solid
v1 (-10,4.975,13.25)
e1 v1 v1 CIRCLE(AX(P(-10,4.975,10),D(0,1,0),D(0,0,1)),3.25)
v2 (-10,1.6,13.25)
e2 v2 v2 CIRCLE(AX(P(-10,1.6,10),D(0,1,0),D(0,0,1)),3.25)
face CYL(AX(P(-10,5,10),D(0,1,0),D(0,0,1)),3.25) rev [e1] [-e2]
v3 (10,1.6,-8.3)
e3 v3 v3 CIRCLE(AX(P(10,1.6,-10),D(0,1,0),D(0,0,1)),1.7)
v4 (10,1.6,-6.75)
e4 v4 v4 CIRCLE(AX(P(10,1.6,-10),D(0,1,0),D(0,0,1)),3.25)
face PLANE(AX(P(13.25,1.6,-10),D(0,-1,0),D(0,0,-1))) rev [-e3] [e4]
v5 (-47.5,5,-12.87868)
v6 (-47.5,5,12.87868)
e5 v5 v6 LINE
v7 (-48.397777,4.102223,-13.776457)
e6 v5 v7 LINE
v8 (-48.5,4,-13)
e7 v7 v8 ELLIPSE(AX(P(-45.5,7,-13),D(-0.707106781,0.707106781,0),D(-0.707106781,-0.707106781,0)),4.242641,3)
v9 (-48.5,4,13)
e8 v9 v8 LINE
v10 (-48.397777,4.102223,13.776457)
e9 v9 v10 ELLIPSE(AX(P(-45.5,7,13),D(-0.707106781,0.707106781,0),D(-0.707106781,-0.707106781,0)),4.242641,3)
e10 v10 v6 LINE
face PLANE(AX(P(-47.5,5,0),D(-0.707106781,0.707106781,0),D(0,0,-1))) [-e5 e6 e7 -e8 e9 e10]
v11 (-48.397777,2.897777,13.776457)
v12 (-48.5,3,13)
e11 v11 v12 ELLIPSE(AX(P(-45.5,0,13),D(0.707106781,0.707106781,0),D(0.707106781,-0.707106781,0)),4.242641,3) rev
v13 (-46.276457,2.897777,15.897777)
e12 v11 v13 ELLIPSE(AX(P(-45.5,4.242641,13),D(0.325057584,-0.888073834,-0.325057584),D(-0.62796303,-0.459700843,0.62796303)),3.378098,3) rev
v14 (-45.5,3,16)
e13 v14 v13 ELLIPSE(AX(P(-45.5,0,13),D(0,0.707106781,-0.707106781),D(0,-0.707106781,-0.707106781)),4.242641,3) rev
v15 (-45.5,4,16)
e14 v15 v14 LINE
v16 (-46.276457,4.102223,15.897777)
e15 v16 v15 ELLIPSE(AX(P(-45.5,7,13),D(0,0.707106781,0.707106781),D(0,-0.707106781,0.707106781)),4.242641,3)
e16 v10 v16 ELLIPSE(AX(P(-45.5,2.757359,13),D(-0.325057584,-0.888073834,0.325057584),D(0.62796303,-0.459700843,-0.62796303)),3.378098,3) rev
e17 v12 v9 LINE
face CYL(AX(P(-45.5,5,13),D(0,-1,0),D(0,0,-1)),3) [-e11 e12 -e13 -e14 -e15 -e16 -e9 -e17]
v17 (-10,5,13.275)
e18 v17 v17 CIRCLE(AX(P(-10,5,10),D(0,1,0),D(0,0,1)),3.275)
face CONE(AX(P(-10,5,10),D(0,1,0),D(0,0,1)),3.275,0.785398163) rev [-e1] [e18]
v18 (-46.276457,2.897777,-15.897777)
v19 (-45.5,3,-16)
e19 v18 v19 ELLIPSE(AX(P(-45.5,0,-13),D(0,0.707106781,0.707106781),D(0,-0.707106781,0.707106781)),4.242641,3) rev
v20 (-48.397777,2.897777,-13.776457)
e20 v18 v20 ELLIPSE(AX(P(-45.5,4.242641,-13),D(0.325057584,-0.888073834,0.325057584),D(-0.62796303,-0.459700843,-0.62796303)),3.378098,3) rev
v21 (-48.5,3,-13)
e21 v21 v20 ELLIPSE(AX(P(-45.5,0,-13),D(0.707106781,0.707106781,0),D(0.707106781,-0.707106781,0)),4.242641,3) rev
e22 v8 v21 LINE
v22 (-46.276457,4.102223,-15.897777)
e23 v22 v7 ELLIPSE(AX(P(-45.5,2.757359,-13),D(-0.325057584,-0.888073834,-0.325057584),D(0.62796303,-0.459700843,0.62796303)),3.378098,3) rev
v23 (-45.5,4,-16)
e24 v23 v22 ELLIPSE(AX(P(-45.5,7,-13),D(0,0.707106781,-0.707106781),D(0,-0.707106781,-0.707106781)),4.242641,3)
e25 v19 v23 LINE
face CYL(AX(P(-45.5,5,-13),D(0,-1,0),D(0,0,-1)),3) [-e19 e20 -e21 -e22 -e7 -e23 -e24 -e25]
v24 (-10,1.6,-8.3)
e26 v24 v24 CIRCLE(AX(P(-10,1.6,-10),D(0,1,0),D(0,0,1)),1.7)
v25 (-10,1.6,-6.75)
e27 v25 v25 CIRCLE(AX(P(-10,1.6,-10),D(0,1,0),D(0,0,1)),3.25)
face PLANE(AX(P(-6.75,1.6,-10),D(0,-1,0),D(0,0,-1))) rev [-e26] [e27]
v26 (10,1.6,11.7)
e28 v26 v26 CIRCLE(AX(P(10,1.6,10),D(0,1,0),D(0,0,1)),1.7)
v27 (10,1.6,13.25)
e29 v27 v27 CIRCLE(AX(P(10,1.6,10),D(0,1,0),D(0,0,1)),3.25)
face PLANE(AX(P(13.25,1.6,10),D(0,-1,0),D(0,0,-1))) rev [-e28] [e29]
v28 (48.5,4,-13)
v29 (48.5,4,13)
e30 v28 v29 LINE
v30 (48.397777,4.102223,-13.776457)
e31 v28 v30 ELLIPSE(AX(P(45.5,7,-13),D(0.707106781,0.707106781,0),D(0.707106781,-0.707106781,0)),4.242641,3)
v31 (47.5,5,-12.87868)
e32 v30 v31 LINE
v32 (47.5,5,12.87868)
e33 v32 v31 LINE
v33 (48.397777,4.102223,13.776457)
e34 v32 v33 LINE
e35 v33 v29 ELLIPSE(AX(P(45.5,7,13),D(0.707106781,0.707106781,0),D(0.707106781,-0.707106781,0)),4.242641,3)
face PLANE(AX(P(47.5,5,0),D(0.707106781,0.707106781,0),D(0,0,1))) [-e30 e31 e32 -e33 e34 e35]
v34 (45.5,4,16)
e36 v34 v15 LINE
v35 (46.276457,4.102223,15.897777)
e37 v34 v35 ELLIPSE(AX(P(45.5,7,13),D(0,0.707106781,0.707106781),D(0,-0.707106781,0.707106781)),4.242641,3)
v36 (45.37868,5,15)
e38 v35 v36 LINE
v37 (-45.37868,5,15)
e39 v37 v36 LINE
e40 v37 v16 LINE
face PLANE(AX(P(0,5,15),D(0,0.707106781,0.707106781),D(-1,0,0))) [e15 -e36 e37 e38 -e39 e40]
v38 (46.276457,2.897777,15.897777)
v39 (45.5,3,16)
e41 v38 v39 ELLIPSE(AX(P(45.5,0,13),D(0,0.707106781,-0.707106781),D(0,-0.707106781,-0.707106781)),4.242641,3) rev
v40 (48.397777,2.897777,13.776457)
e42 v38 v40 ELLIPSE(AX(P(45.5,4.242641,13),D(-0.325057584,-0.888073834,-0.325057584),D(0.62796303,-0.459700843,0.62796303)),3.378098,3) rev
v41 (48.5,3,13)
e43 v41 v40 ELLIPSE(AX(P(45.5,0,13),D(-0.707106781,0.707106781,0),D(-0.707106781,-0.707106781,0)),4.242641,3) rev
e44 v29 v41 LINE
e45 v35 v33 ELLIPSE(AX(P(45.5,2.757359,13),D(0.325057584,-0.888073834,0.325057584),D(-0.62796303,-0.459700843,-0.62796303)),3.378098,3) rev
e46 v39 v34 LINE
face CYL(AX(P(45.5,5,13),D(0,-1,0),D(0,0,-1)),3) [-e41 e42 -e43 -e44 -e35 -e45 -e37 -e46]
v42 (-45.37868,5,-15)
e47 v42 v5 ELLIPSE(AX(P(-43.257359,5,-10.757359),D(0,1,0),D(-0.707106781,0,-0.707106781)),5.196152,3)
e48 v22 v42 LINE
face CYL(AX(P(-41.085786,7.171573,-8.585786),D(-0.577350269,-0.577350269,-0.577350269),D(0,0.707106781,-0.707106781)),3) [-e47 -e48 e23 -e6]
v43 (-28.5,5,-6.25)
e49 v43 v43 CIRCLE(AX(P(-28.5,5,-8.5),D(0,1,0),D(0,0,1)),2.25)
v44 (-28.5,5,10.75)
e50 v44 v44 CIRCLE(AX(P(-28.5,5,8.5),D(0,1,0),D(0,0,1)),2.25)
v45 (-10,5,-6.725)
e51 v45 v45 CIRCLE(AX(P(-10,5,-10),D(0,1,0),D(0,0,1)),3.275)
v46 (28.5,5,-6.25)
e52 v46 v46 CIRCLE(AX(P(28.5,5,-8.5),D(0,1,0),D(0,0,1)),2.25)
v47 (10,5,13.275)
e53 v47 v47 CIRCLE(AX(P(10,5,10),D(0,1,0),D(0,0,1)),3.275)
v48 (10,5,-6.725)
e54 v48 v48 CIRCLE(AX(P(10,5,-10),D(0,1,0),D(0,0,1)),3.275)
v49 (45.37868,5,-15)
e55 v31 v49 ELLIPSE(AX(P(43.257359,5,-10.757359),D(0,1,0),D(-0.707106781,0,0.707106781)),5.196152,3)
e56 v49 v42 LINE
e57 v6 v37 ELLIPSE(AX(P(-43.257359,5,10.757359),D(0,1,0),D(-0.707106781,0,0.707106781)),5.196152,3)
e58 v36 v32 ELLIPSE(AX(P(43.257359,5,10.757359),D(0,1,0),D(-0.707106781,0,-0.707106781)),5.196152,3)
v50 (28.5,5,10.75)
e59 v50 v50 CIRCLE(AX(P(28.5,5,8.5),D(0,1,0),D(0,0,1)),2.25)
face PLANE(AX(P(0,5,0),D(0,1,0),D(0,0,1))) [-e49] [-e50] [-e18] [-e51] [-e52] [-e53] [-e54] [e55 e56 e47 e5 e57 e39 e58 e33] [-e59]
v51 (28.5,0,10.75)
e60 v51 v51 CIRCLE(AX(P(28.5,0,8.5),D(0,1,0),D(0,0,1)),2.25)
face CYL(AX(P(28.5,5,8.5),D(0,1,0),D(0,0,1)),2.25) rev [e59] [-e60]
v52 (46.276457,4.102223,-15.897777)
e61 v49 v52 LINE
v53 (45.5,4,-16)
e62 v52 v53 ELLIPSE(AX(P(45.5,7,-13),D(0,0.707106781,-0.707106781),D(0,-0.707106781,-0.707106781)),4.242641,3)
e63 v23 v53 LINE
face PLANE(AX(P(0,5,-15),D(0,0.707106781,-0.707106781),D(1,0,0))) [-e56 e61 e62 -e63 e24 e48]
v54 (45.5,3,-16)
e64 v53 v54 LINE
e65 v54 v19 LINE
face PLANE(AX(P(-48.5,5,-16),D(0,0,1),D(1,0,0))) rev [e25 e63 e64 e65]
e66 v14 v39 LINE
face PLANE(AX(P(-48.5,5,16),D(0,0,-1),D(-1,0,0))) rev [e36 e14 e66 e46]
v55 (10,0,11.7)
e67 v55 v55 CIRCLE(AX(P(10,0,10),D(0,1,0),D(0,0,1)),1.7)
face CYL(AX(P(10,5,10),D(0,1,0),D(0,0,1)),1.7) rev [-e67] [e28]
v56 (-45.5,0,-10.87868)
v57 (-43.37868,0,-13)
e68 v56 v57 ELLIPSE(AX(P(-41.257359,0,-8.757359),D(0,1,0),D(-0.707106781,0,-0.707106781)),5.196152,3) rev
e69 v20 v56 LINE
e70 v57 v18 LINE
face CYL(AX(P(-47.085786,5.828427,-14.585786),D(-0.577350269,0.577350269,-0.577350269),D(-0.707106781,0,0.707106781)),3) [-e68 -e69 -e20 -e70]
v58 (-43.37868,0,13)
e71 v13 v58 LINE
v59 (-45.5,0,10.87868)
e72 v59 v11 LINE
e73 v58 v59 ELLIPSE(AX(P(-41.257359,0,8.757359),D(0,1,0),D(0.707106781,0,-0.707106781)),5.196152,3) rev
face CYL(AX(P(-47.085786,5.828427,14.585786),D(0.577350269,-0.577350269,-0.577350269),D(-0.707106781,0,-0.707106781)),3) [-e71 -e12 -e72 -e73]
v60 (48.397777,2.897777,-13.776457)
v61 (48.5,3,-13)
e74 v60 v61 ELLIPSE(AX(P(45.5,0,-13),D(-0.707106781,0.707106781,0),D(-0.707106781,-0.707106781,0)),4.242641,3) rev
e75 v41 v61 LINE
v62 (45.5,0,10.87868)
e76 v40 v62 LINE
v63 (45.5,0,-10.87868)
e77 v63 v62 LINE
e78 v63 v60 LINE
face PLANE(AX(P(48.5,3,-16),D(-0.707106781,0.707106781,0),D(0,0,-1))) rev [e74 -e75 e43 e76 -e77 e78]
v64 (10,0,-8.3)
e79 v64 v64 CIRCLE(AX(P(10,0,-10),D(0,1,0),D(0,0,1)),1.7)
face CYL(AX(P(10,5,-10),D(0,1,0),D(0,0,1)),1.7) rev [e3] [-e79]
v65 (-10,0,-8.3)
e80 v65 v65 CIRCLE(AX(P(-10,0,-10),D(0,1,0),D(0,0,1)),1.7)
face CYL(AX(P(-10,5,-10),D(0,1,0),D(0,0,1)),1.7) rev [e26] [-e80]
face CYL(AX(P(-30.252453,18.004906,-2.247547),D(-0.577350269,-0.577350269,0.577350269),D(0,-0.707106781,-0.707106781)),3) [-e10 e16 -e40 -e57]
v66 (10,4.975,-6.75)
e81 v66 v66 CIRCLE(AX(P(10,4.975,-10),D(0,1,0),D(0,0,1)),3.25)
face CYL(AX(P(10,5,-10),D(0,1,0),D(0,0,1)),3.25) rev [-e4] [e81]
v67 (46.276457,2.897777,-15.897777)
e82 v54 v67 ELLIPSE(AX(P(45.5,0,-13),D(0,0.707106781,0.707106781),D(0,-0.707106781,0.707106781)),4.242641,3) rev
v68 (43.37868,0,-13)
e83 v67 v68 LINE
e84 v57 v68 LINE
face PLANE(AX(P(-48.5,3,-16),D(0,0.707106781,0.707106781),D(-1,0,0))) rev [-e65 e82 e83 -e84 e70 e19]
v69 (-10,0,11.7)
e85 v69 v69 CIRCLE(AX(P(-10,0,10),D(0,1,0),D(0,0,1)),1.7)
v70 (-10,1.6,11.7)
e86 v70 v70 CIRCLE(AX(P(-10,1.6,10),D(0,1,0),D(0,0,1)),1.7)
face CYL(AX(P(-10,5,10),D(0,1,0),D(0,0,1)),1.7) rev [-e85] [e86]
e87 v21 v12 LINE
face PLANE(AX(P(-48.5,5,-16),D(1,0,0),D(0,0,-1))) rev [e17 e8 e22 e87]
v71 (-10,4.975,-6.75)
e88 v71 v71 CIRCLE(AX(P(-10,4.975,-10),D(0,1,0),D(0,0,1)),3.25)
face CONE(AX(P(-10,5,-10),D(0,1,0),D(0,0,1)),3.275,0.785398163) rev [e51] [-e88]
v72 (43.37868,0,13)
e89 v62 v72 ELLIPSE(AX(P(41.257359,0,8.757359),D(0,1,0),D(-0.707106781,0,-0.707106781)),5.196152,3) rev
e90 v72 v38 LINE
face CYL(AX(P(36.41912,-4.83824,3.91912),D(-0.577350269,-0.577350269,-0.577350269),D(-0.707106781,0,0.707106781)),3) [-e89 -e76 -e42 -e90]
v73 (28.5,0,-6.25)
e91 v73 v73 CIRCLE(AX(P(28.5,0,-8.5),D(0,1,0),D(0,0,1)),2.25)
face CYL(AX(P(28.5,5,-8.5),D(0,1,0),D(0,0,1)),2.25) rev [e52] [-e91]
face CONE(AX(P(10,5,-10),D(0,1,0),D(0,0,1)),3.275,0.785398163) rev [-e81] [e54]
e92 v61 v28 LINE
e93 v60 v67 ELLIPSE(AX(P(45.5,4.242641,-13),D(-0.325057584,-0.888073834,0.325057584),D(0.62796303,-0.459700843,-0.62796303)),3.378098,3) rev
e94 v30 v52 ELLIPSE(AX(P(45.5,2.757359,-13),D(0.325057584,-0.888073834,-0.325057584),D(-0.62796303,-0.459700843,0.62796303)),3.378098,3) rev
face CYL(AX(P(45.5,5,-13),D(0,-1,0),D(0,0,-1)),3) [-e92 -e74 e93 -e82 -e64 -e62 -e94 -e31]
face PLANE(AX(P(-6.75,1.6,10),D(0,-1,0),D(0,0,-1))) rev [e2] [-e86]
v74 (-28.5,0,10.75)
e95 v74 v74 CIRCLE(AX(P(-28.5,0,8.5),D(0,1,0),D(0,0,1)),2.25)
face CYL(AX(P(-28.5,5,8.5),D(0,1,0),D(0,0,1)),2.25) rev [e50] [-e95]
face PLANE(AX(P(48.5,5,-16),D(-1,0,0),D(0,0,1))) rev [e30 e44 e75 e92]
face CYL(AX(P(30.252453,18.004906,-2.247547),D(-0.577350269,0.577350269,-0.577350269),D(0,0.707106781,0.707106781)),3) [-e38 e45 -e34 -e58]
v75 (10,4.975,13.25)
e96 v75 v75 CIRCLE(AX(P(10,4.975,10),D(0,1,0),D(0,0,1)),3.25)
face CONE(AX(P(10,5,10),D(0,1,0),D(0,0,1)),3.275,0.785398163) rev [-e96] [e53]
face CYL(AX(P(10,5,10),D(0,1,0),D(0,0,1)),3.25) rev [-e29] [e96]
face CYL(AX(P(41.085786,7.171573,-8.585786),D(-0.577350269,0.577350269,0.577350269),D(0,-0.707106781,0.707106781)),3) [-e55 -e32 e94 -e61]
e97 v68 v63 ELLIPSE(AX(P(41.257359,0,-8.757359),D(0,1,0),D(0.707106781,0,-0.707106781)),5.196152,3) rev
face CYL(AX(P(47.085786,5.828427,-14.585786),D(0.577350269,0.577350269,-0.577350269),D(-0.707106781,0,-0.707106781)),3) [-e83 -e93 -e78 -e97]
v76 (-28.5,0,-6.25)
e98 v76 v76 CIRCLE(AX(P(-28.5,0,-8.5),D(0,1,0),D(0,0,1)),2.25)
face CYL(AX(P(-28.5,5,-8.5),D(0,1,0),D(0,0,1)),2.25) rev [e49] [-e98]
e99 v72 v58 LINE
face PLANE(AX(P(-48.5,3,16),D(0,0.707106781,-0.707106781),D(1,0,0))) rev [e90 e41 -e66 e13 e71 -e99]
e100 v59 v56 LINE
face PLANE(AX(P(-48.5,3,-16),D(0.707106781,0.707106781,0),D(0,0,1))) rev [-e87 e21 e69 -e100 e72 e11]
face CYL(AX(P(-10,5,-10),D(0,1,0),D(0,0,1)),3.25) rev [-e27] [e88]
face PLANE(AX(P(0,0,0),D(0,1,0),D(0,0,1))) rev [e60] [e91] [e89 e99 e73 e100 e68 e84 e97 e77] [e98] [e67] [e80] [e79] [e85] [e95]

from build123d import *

# Parameters (mm, degrees)
SKETCH1_W                                    = 97
SKETCH1_H                                    = 32
BOSS_EXTRUDE1_DEPTH                          = 5
HOLE1_D                                      = 4.5
HOLE1_DEPTH                                  = 6
CHAMFER1_SIZE                                = 1
CHAMFER2_SIZE                                = 3
FILLET1_R                                    = 3
CBORE_FOR_M3_HEX_SOCKET_HEAD_CAP_SCR_2_COUNT = 2
CBORE_FOR_M3_HEX_SOCKET_HEAD_CAP_SCR_2_PITCH = 20
CBORE_FOR_M3_HEX_SOCKET_HEAD_CAP_SCR_3_COUNT = 2
CBORE_FOR_M3_HEX_SOCKET_HEAD_CAP_SCR_3_PITCH = 20
CBORE_FOR_M3_HEX_SOCKET_HEAD_CAP_SCR_4_COUNT = 2
CBORE_FOR_M3_HEX_SOCKET_HEAD_CAP_SCR_4_PITCH = 28.284271247


with BuildPart() as part:
    # Sketch1 → Boss-Extrude1 (new body)
    with BuildSketch(Plane(origin=(0, 0, 0), x_dir=(1, 0, 0), z_dir=(0, 1, 0))):
        Rectangle(SKETCH1_W, SKETCH1_H)
    extrude(amount=BOSS_EXTRUDE1_DEPTH)

    # Hole1
    with Locations(Plane(origin=(0, 5, 0), x_dir=(1, 0, 0), z_dir=(0, 1, 0))):
        with Locations((-28.5, 8.5), (-28.5, -8.5), (28.5, -8.5), (28.5, 8.5)):
            Hole(HOLE1_D / 2, depth=HOLE1_DEPTH)

    # Chamfer1
    chamfer1_edges = [part.edges().sort_by_distance(p)[0] for p in [
        (-48.5, 5, 0),
        (0, 5, 16),
        (48.5, 5, 0),
        (0, 5, -16),
    ]]
    chamfer(chamfer1_edges, length=CHAMFER1_SIZE)

    # Chamfer2
    chamfer2_edges = [part.edges().sort_by_distance(p)[0] for p in [
        (0, 0, 16),
        (-48.5, 0, 0),
        (0, 0, -16),
        (48.5, 0, 0),
    ]]
    chamfer(chamfer2_edges, length=CHAMFER2_SIZE)

    # Fillet1
    # the kernel refuses this fillet: 3 mm, written as the material it takes off along each edge
    with BuildSketch(Plane(origin=(48.5, -4.5, 16), x_dir=(0, 0, -1), z_dir=(0, 1, 0)), Plane(origin=(48.5, -4.5, -16), x_dir=(-1, 0, 0), z_dir=(0, 1, 0))) as fillet1_piece_1:
        with BuildLine():
            CenterArc((FILLET1_R, FILLET1_R), FILLET1_R, 180, 90)
            Line((0, FILLET1_R), (0, 0))
            Line((0, 0), (FILLET1_R, 0))
        make_face()
    extrude(amount=16, mode=Mode.SUBTRACT)
    with BuildSketch(Plane(origin=(-48.5, -4.5, 16), x_dir=(0, 0, -1), z_dir=(0, 1, 0)), Plane(origin=(-48.5, -4.5, -16), x_dir=(1, 0, 0), z_dir=(0, 1, 0))) as fillet1_piece_2:
        with BuildLine():
            CenterArc((FILLET1_R, -FILLET1_R), FILLET1_R, 90, 90)
            Line((0, -FILLET1_R), (0, 0))
            Line((0, 0), (FILLET1_R, 0))
        make_face()
    extrude(amount=16, mode=Mode.SUBTRACT)
    with BuildSketch(Plane(origin=(-51, 1.5, -18.5), x_dir=(0.8164965809277261, -0.40824829046386363, -0.40824829046386235), z_dir=(0.5773502691896258, 0.5773502691896258, 0.5773502691896258)), Plane(origin=(-51, 1.5, 18.5), x_dir=(-0.4082482904638625, -0.4082482904638635, -0.8164965809277259), z_dir=(0.5773502691896258, 0.5773502691896258, -0.5773502691896258)), Plane(origin=(45, 7.5, 12.5), x_dir=(0.40824829046386274, -0.40824829046386324, -0.816496580927726), z_dir=(0.5773502691896258, -0.5773502691896258, 0.5773502691896258))) as fillet1_piece_3:
        with BuildLine():
            CenterArc((FILLET1_R * 0.57735026919, -FILLET1_R), FILLET1_R, 90, 60)
            Line((-FILLET1_R * 0.288675134595, -FILLET1_R * 0.5), (0, 0))
            Line((0, 0), (FILLET1_R * 0.57735026919, 0))
        make_face()
    extrude(amount=10.392304845, mode=Mode.SUBTRACT)
    with BuildSketch(Plane(origin=(51, 1.5, -18.5), x_dir=(-0.816496580927726, -0.4082482904638631, -0.40824829046386285), z_dir=(-0.5773502691896258, 0.5773502691896258, 0.5773502691896258))) as fillet1_piece_4:
        with BuildLine():
            CenterArc((FILLET1_R * 0.57735026919, FILLET1_R), FILLET1_R, 210, 60)
            Line((-FILLET1_R * 0.288675134595, FILLET1_R * 0.5), (0, 0))
            Line((0, 0), (FILLET1_R * 0.57735026919, 0))
        make_face()
    extrude(amount=10.392304845, mode=Mode.SUBTRACT)
    with BuildSketch(Plane(origin=(-43, -2.5, 10.5), x_dir=(-0.4082482904638623, 0.4082482904638638, -0.816496580927726), z_dir=(-0.5773502691896258, 0.5773502691896258, 0.5773502691896258)), Plane(origin=(51, 5.5, -18.5), x_dir=(-0.816496580927726, 0.40824829046386324, -0.40824829046386274), z_dir=(-0.5773502691896258, -0.5773502691896258, 0.5773502691896258))) as fillet1_piece_5:
        with BuildLine():
            CenterArc((FILLET1_R * 0.57735026919, -FILLET1_R), FILLET1_R, 90, 60)
            Line((-FILLET1_R * 0.288675134595, -FILLET1_R * 0.5), (0, 0))
            Line((0, 0), (FILLET1_R * 0.57735026919, 0))
        make_face()
    extrude(amount=13.856406461, mode=Mode.SUBTRACT)
    with BuildSketch(Plane(origin=(-51, 5.5, -18.5), x_dir=(0.816496580927726, 0.4082482904638625, -0.4082482904638635), z_dir=(0.5773502691896258, -0.5773502691896258, 0.5773502691896258)), Plane(origin=(43, -2.5, 10.5), x_dir=(0.40824829046386285, 0.40824829046386313, -0.816496580927726), z_dir=(0.5773502691896258, 0.5773502691896258, 0.5773502691896258))) as fillet1_piece_6:
        with BuildLine():
            CenterArc((FILLET1_R * 0.57735026919, FILLET1_R), FILLET1_R, 210, 60)
            Line((-FILLET1_R * 0.288675134595, FILLET1_R * 0.5), (0, 0))
            Line((0, 0), (FILLET1_R * 0.57735026919, 0))
        make_face()
    extrude(amount=13.856406461, mode=Mode.SUBTRACT)

    # Sketch7 → CBORE for M3 Hex Socket Head Cap Screw1 (revolve, cut)
    with BuildSketch(Plane(origin=(10, 5, -10), x_dir=(0, 0, 1), z_dir=(1, 0, 0))):
        Polygon((0, 0), (0, 5), (1.7, 5), (1.7, 3.4), (3.25, 3.4), (3.25, 0.025), (3.275, 0), align=None)
    cbore_for_m3_hex_socket_head_cap_screw1 = revolve(axis=Axis((10, 11.35, -10), (0, -1, 0)), mode=Mode.SUBTRACT)

    # CBORE for M3 Hex Socket Head Cap Scr 2: CBORE for M3 Hex Socket Head Cap Screw1 ×2
    with Locations(*[(-i * CBORE_FOR_M3_HEX_SOCKET_HEAD_CAP_SCR_2_PITCH, 0, 0) for i in range(1, CBORE_FOR_M3_HEX_SOCKET_HEAD_CAP_SCR_2_COUNT)]):
        add(cbore_for_m3_hex_socket_head_cap_screw1, mode=Mode.SUBTRACT)

    # CBORE for M3 Hex Socket Head Cap Scr 3: CBORE for M3 Hex Socket Head Cap Screw1 ×2
    with Locations(*[(0, 0, i * CBORE_FOR_M3_HEX_SOCKET_HEAD_CAP_SCR_3_PITCH) for i in range(1, CBORE_FOR_M3_HEX_SOCKET_HEAD_CAP_SCR_3_COUNT)]):
        add(cbore_for_m3_hex_socket_head_cap_screw1, mode=Mode.SUBTRACT)

    # CBORE for M3 Hex Socket Head Cap Scr 4: CBORE for M3 Hex Socket Head Cap Screw1 ×2
    with Locations(*[Vector(-0.7071067811865475, 0, 0.7071067811865477) * (i * CBORE_FOR_M3_HEX_SOCKET_HEAD_CAP_SCR_4_PITCH) for i in range(1, CBORE_FOR_M3_HEX_SOCKET_HEAD_CAP_SCR_4_COUNT)]):
        add(cbore_for_m3_hex_socket_head_cap_screw1, mode=Mode.SUBTRACT)


solid = part.part
